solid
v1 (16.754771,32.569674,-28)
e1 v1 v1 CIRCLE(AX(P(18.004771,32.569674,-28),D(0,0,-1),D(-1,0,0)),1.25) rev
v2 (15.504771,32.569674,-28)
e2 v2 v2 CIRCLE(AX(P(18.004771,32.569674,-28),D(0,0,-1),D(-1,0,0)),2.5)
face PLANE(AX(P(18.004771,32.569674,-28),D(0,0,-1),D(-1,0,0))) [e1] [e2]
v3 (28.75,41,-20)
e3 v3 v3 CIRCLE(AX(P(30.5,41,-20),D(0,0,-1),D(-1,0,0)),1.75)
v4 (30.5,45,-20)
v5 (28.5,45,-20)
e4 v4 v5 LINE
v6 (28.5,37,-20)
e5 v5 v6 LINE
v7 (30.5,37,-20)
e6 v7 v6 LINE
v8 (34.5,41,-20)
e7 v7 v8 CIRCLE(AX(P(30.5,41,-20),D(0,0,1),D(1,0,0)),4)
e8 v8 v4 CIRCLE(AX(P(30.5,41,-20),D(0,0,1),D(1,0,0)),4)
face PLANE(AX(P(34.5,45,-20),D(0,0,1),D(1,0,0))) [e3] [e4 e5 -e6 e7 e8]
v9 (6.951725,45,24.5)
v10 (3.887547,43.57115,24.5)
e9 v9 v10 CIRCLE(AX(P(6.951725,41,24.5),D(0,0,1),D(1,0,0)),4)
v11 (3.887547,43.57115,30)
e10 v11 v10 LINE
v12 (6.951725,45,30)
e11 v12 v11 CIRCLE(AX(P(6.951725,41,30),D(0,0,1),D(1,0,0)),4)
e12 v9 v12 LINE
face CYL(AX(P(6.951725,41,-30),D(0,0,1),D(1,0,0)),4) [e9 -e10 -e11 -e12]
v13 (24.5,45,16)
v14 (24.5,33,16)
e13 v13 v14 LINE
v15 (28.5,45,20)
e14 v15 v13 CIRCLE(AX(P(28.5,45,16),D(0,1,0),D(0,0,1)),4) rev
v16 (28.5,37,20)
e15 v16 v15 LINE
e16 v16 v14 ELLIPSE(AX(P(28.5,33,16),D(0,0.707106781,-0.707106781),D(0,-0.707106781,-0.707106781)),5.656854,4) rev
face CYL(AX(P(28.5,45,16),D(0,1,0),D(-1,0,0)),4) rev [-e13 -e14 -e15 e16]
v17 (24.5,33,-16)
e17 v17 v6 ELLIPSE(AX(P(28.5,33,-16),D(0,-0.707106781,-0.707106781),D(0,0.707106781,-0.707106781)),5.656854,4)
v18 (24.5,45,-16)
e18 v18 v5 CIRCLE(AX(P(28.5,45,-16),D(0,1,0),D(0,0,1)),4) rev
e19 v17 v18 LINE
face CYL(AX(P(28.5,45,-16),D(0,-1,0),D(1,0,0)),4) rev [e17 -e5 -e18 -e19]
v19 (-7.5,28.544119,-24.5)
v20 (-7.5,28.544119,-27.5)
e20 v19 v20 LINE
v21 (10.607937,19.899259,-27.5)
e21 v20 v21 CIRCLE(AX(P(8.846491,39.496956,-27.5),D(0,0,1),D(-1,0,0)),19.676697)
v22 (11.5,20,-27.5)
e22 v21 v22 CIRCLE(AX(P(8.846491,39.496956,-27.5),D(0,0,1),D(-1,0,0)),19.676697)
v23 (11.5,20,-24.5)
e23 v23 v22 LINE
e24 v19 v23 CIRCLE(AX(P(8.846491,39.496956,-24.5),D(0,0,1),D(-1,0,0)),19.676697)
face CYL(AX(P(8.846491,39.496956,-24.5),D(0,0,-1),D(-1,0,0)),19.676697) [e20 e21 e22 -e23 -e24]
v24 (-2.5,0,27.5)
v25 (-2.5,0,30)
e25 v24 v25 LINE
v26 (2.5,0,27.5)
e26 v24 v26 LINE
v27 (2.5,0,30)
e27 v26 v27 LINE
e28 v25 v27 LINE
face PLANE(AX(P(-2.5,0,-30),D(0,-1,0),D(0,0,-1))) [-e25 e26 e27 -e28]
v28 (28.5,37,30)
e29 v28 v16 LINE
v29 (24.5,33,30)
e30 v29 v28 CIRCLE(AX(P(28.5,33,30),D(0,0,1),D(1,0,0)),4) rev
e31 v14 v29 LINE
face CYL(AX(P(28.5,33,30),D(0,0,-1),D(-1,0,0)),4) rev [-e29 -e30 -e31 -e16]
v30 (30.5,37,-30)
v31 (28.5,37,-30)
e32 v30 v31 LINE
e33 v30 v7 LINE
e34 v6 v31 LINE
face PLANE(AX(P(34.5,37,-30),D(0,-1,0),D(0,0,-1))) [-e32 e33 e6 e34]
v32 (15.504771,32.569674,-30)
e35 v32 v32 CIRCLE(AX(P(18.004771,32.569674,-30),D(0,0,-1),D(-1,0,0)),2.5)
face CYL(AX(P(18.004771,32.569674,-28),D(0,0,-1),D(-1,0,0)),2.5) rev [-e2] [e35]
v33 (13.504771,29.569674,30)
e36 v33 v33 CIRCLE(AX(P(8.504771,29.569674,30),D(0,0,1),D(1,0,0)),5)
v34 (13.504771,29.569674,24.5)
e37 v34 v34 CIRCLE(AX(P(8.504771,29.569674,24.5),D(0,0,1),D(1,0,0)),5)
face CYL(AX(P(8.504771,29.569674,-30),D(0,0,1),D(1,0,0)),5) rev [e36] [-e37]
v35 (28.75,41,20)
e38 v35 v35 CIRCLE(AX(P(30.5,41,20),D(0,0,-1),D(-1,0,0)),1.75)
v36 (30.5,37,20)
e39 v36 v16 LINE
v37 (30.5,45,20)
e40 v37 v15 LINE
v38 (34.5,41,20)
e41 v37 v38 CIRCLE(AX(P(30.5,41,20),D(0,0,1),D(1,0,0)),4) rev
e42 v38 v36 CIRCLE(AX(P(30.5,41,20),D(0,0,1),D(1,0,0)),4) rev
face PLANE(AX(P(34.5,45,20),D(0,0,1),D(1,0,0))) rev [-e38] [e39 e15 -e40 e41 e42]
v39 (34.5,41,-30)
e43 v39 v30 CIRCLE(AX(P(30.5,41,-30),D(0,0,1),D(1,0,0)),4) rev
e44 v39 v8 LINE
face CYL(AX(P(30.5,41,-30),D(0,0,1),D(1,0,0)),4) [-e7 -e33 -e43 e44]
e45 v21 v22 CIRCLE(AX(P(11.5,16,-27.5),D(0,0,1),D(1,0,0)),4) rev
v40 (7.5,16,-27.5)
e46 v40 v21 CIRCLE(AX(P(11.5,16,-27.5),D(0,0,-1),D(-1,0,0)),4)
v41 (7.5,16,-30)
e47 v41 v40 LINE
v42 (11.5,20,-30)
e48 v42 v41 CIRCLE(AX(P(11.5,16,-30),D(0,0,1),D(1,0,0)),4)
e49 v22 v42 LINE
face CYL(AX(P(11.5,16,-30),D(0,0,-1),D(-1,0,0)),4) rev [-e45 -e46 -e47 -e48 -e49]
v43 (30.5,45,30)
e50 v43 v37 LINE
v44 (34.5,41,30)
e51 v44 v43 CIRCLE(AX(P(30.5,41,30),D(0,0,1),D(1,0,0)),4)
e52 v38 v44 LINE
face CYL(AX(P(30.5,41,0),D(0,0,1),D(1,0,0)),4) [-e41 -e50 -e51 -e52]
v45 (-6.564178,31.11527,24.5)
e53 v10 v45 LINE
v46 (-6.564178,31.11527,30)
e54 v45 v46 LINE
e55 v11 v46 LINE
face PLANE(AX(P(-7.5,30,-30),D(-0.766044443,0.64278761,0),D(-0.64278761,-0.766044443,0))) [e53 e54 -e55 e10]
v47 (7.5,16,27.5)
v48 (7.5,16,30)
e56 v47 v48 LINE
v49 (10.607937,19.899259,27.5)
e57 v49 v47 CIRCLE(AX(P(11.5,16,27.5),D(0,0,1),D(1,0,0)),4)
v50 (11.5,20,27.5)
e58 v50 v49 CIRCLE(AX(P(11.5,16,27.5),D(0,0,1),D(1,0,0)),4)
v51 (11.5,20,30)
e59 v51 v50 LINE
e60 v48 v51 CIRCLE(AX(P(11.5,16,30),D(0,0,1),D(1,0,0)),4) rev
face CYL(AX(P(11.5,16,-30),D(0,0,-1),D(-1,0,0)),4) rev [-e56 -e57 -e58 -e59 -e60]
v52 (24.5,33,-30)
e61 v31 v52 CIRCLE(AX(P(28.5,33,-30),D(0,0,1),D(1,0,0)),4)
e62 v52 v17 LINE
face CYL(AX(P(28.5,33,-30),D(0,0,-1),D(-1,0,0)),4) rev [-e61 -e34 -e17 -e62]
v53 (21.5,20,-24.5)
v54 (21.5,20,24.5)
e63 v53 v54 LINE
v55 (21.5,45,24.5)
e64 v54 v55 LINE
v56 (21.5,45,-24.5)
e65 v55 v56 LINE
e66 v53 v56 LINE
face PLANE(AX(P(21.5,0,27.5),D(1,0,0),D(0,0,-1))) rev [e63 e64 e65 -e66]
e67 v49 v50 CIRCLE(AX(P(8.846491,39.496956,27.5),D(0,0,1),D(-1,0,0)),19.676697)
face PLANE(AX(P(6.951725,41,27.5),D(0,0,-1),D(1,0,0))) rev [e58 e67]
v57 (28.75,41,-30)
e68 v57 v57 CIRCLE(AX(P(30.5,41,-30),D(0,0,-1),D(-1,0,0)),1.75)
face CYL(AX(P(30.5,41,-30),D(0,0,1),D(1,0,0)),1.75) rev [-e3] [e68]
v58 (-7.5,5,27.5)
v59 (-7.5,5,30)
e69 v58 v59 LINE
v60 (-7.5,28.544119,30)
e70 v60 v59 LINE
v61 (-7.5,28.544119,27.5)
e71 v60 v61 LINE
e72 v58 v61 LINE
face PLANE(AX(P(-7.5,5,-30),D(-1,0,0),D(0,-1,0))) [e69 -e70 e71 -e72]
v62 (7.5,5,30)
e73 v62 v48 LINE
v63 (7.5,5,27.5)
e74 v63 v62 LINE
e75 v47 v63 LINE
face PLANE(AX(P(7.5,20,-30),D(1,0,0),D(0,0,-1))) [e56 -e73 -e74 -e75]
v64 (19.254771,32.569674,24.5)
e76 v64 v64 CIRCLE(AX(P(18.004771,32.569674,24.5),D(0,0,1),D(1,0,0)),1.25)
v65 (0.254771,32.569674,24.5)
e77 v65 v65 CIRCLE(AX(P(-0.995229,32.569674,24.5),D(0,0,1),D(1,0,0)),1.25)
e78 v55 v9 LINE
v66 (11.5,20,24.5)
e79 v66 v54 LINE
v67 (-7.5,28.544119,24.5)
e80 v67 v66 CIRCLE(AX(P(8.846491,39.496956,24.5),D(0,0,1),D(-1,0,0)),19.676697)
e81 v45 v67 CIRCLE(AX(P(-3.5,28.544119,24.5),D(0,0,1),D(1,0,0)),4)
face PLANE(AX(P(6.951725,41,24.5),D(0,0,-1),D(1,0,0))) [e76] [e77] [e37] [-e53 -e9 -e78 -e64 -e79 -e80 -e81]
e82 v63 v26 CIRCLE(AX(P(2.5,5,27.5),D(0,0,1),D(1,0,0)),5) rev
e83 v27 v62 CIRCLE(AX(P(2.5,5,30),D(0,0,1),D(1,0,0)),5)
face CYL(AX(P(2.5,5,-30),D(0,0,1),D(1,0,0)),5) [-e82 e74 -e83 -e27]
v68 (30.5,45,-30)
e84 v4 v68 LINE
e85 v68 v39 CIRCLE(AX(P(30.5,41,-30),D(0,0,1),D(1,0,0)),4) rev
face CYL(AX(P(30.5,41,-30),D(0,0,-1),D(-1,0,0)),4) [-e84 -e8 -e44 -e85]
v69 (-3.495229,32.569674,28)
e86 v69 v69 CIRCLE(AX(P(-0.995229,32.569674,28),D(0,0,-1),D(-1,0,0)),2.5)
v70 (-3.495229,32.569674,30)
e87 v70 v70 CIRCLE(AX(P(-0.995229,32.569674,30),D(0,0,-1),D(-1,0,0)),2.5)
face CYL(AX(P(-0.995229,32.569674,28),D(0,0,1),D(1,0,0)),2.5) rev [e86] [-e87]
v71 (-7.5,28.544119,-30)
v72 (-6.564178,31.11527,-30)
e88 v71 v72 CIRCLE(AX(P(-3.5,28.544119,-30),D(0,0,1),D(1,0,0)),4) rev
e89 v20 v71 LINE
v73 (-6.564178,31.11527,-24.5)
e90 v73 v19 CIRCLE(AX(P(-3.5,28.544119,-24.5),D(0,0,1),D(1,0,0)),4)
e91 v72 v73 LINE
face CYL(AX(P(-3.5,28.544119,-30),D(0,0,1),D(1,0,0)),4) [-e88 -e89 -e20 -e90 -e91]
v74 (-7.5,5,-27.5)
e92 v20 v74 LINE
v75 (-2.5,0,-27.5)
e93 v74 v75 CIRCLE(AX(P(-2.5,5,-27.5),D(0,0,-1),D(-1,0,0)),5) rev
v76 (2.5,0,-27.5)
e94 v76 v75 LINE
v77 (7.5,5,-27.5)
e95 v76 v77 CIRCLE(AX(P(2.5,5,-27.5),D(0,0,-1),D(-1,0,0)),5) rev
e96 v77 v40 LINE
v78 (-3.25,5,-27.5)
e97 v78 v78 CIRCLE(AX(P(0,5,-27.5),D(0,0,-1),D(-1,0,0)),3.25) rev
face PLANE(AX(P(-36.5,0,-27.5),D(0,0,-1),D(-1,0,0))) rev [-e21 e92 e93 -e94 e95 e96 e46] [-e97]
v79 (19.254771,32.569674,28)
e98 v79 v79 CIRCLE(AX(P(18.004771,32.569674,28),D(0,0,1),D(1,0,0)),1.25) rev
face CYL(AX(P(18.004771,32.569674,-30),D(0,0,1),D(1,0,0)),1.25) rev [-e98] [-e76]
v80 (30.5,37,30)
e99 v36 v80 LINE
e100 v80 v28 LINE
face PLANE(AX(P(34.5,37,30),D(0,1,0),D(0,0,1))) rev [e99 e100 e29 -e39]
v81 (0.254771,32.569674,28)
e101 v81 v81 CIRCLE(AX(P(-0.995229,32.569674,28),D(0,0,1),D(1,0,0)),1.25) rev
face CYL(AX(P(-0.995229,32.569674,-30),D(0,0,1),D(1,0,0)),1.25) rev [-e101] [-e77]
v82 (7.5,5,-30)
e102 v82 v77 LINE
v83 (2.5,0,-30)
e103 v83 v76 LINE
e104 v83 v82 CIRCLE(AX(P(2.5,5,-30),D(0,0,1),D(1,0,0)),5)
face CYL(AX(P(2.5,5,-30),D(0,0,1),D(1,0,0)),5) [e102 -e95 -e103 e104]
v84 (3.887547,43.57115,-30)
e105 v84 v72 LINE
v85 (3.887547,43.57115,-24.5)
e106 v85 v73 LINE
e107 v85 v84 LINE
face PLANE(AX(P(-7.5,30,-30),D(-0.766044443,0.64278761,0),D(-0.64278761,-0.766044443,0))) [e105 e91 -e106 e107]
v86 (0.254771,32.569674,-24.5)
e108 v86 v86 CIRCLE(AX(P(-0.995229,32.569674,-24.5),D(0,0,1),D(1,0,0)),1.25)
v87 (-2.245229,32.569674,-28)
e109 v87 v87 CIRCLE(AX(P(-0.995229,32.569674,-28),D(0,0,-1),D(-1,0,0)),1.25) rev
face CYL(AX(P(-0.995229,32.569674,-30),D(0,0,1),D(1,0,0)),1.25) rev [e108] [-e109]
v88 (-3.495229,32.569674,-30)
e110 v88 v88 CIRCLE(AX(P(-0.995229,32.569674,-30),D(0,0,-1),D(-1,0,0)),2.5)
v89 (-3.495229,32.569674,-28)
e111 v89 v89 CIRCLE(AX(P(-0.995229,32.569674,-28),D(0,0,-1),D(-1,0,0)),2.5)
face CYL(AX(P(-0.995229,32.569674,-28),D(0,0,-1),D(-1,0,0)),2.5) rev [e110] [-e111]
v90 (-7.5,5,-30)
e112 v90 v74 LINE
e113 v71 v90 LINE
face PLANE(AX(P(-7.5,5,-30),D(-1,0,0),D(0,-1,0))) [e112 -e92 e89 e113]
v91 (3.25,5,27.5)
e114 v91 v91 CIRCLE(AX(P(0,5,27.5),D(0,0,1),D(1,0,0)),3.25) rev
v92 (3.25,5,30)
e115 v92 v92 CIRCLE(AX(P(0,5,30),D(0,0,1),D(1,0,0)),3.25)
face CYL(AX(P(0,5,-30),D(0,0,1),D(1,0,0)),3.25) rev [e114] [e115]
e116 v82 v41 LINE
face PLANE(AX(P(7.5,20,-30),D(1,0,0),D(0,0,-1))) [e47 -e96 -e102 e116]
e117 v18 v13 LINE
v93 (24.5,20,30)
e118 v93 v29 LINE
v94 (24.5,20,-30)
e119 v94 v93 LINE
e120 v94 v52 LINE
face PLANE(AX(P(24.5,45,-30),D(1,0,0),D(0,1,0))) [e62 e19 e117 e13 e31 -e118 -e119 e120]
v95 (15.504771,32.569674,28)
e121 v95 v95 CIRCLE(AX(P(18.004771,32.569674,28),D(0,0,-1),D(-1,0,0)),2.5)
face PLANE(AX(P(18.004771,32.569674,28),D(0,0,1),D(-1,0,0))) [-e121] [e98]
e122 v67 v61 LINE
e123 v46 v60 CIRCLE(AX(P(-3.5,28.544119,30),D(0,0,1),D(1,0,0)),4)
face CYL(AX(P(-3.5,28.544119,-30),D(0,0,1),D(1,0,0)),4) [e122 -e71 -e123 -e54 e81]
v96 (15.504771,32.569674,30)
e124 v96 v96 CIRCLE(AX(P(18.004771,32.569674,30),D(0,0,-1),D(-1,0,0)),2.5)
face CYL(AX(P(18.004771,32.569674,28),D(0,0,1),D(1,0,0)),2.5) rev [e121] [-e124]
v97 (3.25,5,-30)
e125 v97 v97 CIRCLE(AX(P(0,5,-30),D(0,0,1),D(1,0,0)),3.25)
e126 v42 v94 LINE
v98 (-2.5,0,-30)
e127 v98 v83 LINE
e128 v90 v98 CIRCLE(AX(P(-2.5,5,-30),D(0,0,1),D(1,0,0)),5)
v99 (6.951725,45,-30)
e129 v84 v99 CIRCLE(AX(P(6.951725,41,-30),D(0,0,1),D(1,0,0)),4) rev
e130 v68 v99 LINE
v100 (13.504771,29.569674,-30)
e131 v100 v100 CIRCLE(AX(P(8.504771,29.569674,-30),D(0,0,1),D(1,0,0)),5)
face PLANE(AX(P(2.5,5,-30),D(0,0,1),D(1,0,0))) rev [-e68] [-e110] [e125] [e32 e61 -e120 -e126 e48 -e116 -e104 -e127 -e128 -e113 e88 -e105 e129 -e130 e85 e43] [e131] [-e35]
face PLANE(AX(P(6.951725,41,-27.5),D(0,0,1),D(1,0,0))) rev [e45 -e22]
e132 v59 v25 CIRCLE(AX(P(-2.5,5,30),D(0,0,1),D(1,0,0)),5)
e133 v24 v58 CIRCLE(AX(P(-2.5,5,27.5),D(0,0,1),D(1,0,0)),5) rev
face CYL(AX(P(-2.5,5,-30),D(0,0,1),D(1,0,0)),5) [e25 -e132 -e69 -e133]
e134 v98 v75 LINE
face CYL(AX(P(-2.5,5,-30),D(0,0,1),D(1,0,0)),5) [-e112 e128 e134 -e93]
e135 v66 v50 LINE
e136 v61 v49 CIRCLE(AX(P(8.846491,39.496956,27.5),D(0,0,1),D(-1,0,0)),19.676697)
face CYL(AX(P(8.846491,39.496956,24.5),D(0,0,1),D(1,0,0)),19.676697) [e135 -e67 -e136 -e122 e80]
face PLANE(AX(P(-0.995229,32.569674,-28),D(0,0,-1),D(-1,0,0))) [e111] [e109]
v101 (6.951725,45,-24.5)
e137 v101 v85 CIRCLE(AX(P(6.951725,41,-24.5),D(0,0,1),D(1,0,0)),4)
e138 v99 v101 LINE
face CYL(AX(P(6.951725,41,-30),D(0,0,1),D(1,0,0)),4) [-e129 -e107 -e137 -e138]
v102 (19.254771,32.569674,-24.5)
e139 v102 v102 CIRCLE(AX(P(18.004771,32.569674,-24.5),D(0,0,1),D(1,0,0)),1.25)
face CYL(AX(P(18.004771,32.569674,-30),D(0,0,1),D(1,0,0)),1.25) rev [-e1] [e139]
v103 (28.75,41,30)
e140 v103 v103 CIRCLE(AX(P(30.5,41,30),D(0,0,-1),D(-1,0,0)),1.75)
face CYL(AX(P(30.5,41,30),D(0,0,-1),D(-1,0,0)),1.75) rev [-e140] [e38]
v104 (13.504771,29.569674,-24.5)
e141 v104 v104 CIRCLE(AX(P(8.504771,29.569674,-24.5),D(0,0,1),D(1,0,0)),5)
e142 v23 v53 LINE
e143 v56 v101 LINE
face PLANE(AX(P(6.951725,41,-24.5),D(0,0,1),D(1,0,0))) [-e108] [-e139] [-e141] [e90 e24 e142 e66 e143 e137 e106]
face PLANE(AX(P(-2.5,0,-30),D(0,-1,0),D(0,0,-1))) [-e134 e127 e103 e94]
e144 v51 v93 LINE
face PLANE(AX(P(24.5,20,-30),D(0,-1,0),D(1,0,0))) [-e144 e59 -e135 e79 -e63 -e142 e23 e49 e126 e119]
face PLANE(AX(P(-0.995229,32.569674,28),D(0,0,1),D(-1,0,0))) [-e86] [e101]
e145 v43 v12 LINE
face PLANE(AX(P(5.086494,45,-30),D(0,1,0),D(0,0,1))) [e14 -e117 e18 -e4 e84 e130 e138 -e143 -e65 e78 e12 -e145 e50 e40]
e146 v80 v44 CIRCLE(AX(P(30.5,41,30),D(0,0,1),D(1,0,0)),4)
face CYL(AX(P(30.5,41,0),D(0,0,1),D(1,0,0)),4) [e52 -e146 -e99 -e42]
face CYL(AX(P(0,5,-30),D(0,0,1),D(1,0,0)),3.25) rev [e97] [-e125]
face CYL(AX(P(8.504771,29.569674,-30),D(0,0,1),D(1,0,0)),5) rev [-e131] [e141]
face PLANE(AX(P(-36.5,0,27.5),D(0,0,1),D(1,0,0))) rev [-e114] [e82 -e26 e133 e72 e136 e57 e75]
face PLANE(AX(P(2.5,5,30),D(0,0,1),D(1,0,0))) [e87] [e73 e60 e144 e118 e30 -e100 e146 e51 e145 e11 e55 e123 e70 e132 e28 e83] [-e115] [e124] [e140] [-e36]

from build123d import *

# Parameters (mm, degrees)
BOSS_EXTRUDE1_DEPTH      = 30
BOSS_EXTRUDE1_DEPTH_BACK = 30
SKETCH2_R                = 3.25
SKETCH2_R_2              = 1.25
SKETCH2_R_3              = 5
SKETCH3_W                = 58
SKETCH3_H                = 55
CUT_EXTRUDE1_DEPTH       = 60.373815778
SKETCH4_W                = 10
SKETCH4_H                = 8
BOSS_EXTRUDE2_DEPTH      = 10
FILLET1_R                = 4
SKETCH5_R                = 1.75
CUT_EXTRUDE2_DEPTH       = 76.599272483
FILLET1_OF_MIRROR1_R     = 4
FILLET2_R                = 4
SKETCH6_R                = 1.25
SKETCH6_R_2              = 5
BOSS_EXTRUDE3_DEPTH      = 3
SKETCH7_R                = 2.5
CUT_EXTRUDE3_DEPTH       = 2


with BuildPart() as part:
    # Sketch2 → Boss-Extrude1 (new, two sides: drawn at the far end of the back side and taken through both)
    with BuildSketch(Plane.XY.offset(-BOSS_EXTRUDE1_DEPTH_BACK)):
        with BuildLine():
            Line((-7.5, 5), (-7.5, 30))
            Line((-7.5, 30), (5.086494468, 45))
            Line((5.086494468, 45), (24.5, 45))
            Line((24.5, 45), (24.5, 20))
            Line((24.5, 20), (7.5, 20))
            Line((7.5, 20), (7.5, 5))
            ThreePointArc((7.5, 5), (6.035533906, 1.464466094), (2.5, 0))
            Line((2.5, 0), (-2.5, 0))
            ThreePointArc((-2.5, 0), (-6.035533906, 1.464466094), (-7.5, 5))
        make_face()
        with Locations((0, 5)):
            Circle(SKETCH2_R, mode=Mode.SUBTRACT)
        with Locations((18.004770913, 32.569673822)):
            Circle(SKETCH2_R_2, mode=Mode.SUBTRACT)
        with Locations((-0.995229087, 32.569673822)):
            Circle(SKETCH2_R_2, mode=Mode.SUBTRACT)
        with Locations((8.504770913, 29.569673822)):
            Circle(SKETCH2_R_3, mode=Mode.SUBTRACT)
    extrude(amount=BOSS_EXTRUDE1_DEPTH + BOSS_EXTRUDE1_DEPTH_BACK)

    # Sketch3 → Cut-Extrude1 (cut, through all)
    with BuildSketch(Plane(origin=(0, 45, 0), x_dir=(1, 0, 0), z_dir=(0, 1, 0))):
        with Locations((-7.5, 0)):
            Rectangle(SKETCH3_W, SKETCH3_H)
    extrude(amount=-CUT_EXTRUDE1_DEPTH, mode=Mode.SUBTRACT)

    # Sketch4 → Boss-Extrude2 (add)
    with BuildSketch(Plane(origin=(24.5, 0, 0), x_dir=(0, 0, -1), z_dir=(1, 0, 0))):
        with Locations((-25, 41)):
            Rectangle(SKETCH4_W, SKETCH4_H)
    boss_extrude2 = extrude(amount=BOSS_EXTRUDE2_DEPTH)

    # Fillet1
    fillet1_edges = [part.edges().sort_by_distance(p)[0] for p in [
        (34.5, 37, 25),
        (34.5, 45, 25),
    ]]
    fillet(fillet1_edges, radius=FILLET1_R - 0.0001)  # a hair under: the kernel refuses the full size

    # Sketch5 → Cut-Extrude2 (cut, through all)
    with BuildSketch(Plane(origin=(0, 0, 20), x_dir=(-1, 0, 0), z_dir=(0, 0, -1))):
        with Locations((-30.5, 41)):
            Circle(SKETCH5_R)
    cut_extrude2 = extrude(amount=-CUT_EXTRUDE2_DEPTH, mode=Mode.SUBTRACT)

    # Mirror1: Boss-Extrude2, Cut-Extrude2 across plane
    add(boss_extrude2.mirror(Plane.XY))
    add(cut_extrude2.mirror(Plane.XY), mode=Mode.SUBTRACT)

    # Fillet1 of Mirror1
    fillet1_of_mirror1_edges = [part.edges().sort_by_distance(p)[0] for p in [
        (34.5, 37, -25),
        (34.5, 45, -25),
    ]]
    fillet(fillet1_of_mirror1_edges, radius=FILLET1_OF_MIRROR1_R - 0.0001)  # a hair under: the kernel refuses the full size

    # Fillet2
    fillet2_edges = [part.edges().sort_by_distance(p)[0] for p in [
        (24.5, 37, 25),
        (24.5, 41, 20),
        (24.5, 37, -25),
        (24.5, 41, -20),
        (5.086494468, 45, -28.75),
        (7.5, 20, -28.75),
        (-7.5, 30, -28.75),
        (-7.5, 30, 28.75),
        (7.5, 20, 28.75),
        (5.086494468, 45, 28.75),
    ]]
    fillet(fillet2_edges, radius=FILLET2_R)

    # Sketch6 → Boss-Extrude3 (add)
    with BuildSketch(Plane.XY.offset(-27.5)):
        with BuildLine():
            Line((21.5, 45), (6.9517251, 45))
            ThreePointArc((6.9517251, 45), (5.261252053, 44.625231148), (3.887547328, 43.571150439))
            Line((3.887547328, 43.571150439), (-6.564177772, 31.115269502))
            ThreePointArc((-6.564177772, 31.115269502), (-7.258770483, 29.912199636), (-7.5, 28.544119063))
            ThreePointArc((-7.5, 28.544119063), (0.776489044, 21.551274863), (11.5, 20))
            Line((11.5, 20), (21.5, 20))
            Line((21.5, 20), (21.5, 45))
        make_face()
        with Locations((18.004770913, 32.569673822)):
            Circle(SKETCH6_R, mode=Mode.SUBTRACT)
        with Locations((8.504770913, 29.569673822)):
            Circle(SKETCH6_R_2, mode=Mode.SUBTRACT)
        with Locations((-0.995229087, 32.569673822)):
            Circle(SKETCH6_R, mode=Mode.SUBTRACT)
    boss_extrude3 = extrude(amount=BOSS_EXTRUDE3_DEPTH)

    # Sketch7 → Cut-Extrude3 (cut)
    with BuildSketch(Plane(origin=(0, 0, -30), x_dir=(-1, 0, 0), z_dir=(0, 0, -1))):
        with Locations((-18.004770913, 32.569673822)):
            Circle(SKETCH7_R)
        with Locations((0.995229087, 32.569673822)):
            Circle(SKETCH7_R)
    cut_extrude3 = extrude(amount=-CUT_EXTRUDE3_DEPTH, mode=Mode.SUBTRACT)

    # Mirror2: Boss-Extrude3, Cut-Extrude3 across plane
    add(boss_extrude3.mirror(Plane.XY))
    add(cut_extrude3.mirror(Plane.XY), mode=Mode.SUBTRACT)


solid = part.part
